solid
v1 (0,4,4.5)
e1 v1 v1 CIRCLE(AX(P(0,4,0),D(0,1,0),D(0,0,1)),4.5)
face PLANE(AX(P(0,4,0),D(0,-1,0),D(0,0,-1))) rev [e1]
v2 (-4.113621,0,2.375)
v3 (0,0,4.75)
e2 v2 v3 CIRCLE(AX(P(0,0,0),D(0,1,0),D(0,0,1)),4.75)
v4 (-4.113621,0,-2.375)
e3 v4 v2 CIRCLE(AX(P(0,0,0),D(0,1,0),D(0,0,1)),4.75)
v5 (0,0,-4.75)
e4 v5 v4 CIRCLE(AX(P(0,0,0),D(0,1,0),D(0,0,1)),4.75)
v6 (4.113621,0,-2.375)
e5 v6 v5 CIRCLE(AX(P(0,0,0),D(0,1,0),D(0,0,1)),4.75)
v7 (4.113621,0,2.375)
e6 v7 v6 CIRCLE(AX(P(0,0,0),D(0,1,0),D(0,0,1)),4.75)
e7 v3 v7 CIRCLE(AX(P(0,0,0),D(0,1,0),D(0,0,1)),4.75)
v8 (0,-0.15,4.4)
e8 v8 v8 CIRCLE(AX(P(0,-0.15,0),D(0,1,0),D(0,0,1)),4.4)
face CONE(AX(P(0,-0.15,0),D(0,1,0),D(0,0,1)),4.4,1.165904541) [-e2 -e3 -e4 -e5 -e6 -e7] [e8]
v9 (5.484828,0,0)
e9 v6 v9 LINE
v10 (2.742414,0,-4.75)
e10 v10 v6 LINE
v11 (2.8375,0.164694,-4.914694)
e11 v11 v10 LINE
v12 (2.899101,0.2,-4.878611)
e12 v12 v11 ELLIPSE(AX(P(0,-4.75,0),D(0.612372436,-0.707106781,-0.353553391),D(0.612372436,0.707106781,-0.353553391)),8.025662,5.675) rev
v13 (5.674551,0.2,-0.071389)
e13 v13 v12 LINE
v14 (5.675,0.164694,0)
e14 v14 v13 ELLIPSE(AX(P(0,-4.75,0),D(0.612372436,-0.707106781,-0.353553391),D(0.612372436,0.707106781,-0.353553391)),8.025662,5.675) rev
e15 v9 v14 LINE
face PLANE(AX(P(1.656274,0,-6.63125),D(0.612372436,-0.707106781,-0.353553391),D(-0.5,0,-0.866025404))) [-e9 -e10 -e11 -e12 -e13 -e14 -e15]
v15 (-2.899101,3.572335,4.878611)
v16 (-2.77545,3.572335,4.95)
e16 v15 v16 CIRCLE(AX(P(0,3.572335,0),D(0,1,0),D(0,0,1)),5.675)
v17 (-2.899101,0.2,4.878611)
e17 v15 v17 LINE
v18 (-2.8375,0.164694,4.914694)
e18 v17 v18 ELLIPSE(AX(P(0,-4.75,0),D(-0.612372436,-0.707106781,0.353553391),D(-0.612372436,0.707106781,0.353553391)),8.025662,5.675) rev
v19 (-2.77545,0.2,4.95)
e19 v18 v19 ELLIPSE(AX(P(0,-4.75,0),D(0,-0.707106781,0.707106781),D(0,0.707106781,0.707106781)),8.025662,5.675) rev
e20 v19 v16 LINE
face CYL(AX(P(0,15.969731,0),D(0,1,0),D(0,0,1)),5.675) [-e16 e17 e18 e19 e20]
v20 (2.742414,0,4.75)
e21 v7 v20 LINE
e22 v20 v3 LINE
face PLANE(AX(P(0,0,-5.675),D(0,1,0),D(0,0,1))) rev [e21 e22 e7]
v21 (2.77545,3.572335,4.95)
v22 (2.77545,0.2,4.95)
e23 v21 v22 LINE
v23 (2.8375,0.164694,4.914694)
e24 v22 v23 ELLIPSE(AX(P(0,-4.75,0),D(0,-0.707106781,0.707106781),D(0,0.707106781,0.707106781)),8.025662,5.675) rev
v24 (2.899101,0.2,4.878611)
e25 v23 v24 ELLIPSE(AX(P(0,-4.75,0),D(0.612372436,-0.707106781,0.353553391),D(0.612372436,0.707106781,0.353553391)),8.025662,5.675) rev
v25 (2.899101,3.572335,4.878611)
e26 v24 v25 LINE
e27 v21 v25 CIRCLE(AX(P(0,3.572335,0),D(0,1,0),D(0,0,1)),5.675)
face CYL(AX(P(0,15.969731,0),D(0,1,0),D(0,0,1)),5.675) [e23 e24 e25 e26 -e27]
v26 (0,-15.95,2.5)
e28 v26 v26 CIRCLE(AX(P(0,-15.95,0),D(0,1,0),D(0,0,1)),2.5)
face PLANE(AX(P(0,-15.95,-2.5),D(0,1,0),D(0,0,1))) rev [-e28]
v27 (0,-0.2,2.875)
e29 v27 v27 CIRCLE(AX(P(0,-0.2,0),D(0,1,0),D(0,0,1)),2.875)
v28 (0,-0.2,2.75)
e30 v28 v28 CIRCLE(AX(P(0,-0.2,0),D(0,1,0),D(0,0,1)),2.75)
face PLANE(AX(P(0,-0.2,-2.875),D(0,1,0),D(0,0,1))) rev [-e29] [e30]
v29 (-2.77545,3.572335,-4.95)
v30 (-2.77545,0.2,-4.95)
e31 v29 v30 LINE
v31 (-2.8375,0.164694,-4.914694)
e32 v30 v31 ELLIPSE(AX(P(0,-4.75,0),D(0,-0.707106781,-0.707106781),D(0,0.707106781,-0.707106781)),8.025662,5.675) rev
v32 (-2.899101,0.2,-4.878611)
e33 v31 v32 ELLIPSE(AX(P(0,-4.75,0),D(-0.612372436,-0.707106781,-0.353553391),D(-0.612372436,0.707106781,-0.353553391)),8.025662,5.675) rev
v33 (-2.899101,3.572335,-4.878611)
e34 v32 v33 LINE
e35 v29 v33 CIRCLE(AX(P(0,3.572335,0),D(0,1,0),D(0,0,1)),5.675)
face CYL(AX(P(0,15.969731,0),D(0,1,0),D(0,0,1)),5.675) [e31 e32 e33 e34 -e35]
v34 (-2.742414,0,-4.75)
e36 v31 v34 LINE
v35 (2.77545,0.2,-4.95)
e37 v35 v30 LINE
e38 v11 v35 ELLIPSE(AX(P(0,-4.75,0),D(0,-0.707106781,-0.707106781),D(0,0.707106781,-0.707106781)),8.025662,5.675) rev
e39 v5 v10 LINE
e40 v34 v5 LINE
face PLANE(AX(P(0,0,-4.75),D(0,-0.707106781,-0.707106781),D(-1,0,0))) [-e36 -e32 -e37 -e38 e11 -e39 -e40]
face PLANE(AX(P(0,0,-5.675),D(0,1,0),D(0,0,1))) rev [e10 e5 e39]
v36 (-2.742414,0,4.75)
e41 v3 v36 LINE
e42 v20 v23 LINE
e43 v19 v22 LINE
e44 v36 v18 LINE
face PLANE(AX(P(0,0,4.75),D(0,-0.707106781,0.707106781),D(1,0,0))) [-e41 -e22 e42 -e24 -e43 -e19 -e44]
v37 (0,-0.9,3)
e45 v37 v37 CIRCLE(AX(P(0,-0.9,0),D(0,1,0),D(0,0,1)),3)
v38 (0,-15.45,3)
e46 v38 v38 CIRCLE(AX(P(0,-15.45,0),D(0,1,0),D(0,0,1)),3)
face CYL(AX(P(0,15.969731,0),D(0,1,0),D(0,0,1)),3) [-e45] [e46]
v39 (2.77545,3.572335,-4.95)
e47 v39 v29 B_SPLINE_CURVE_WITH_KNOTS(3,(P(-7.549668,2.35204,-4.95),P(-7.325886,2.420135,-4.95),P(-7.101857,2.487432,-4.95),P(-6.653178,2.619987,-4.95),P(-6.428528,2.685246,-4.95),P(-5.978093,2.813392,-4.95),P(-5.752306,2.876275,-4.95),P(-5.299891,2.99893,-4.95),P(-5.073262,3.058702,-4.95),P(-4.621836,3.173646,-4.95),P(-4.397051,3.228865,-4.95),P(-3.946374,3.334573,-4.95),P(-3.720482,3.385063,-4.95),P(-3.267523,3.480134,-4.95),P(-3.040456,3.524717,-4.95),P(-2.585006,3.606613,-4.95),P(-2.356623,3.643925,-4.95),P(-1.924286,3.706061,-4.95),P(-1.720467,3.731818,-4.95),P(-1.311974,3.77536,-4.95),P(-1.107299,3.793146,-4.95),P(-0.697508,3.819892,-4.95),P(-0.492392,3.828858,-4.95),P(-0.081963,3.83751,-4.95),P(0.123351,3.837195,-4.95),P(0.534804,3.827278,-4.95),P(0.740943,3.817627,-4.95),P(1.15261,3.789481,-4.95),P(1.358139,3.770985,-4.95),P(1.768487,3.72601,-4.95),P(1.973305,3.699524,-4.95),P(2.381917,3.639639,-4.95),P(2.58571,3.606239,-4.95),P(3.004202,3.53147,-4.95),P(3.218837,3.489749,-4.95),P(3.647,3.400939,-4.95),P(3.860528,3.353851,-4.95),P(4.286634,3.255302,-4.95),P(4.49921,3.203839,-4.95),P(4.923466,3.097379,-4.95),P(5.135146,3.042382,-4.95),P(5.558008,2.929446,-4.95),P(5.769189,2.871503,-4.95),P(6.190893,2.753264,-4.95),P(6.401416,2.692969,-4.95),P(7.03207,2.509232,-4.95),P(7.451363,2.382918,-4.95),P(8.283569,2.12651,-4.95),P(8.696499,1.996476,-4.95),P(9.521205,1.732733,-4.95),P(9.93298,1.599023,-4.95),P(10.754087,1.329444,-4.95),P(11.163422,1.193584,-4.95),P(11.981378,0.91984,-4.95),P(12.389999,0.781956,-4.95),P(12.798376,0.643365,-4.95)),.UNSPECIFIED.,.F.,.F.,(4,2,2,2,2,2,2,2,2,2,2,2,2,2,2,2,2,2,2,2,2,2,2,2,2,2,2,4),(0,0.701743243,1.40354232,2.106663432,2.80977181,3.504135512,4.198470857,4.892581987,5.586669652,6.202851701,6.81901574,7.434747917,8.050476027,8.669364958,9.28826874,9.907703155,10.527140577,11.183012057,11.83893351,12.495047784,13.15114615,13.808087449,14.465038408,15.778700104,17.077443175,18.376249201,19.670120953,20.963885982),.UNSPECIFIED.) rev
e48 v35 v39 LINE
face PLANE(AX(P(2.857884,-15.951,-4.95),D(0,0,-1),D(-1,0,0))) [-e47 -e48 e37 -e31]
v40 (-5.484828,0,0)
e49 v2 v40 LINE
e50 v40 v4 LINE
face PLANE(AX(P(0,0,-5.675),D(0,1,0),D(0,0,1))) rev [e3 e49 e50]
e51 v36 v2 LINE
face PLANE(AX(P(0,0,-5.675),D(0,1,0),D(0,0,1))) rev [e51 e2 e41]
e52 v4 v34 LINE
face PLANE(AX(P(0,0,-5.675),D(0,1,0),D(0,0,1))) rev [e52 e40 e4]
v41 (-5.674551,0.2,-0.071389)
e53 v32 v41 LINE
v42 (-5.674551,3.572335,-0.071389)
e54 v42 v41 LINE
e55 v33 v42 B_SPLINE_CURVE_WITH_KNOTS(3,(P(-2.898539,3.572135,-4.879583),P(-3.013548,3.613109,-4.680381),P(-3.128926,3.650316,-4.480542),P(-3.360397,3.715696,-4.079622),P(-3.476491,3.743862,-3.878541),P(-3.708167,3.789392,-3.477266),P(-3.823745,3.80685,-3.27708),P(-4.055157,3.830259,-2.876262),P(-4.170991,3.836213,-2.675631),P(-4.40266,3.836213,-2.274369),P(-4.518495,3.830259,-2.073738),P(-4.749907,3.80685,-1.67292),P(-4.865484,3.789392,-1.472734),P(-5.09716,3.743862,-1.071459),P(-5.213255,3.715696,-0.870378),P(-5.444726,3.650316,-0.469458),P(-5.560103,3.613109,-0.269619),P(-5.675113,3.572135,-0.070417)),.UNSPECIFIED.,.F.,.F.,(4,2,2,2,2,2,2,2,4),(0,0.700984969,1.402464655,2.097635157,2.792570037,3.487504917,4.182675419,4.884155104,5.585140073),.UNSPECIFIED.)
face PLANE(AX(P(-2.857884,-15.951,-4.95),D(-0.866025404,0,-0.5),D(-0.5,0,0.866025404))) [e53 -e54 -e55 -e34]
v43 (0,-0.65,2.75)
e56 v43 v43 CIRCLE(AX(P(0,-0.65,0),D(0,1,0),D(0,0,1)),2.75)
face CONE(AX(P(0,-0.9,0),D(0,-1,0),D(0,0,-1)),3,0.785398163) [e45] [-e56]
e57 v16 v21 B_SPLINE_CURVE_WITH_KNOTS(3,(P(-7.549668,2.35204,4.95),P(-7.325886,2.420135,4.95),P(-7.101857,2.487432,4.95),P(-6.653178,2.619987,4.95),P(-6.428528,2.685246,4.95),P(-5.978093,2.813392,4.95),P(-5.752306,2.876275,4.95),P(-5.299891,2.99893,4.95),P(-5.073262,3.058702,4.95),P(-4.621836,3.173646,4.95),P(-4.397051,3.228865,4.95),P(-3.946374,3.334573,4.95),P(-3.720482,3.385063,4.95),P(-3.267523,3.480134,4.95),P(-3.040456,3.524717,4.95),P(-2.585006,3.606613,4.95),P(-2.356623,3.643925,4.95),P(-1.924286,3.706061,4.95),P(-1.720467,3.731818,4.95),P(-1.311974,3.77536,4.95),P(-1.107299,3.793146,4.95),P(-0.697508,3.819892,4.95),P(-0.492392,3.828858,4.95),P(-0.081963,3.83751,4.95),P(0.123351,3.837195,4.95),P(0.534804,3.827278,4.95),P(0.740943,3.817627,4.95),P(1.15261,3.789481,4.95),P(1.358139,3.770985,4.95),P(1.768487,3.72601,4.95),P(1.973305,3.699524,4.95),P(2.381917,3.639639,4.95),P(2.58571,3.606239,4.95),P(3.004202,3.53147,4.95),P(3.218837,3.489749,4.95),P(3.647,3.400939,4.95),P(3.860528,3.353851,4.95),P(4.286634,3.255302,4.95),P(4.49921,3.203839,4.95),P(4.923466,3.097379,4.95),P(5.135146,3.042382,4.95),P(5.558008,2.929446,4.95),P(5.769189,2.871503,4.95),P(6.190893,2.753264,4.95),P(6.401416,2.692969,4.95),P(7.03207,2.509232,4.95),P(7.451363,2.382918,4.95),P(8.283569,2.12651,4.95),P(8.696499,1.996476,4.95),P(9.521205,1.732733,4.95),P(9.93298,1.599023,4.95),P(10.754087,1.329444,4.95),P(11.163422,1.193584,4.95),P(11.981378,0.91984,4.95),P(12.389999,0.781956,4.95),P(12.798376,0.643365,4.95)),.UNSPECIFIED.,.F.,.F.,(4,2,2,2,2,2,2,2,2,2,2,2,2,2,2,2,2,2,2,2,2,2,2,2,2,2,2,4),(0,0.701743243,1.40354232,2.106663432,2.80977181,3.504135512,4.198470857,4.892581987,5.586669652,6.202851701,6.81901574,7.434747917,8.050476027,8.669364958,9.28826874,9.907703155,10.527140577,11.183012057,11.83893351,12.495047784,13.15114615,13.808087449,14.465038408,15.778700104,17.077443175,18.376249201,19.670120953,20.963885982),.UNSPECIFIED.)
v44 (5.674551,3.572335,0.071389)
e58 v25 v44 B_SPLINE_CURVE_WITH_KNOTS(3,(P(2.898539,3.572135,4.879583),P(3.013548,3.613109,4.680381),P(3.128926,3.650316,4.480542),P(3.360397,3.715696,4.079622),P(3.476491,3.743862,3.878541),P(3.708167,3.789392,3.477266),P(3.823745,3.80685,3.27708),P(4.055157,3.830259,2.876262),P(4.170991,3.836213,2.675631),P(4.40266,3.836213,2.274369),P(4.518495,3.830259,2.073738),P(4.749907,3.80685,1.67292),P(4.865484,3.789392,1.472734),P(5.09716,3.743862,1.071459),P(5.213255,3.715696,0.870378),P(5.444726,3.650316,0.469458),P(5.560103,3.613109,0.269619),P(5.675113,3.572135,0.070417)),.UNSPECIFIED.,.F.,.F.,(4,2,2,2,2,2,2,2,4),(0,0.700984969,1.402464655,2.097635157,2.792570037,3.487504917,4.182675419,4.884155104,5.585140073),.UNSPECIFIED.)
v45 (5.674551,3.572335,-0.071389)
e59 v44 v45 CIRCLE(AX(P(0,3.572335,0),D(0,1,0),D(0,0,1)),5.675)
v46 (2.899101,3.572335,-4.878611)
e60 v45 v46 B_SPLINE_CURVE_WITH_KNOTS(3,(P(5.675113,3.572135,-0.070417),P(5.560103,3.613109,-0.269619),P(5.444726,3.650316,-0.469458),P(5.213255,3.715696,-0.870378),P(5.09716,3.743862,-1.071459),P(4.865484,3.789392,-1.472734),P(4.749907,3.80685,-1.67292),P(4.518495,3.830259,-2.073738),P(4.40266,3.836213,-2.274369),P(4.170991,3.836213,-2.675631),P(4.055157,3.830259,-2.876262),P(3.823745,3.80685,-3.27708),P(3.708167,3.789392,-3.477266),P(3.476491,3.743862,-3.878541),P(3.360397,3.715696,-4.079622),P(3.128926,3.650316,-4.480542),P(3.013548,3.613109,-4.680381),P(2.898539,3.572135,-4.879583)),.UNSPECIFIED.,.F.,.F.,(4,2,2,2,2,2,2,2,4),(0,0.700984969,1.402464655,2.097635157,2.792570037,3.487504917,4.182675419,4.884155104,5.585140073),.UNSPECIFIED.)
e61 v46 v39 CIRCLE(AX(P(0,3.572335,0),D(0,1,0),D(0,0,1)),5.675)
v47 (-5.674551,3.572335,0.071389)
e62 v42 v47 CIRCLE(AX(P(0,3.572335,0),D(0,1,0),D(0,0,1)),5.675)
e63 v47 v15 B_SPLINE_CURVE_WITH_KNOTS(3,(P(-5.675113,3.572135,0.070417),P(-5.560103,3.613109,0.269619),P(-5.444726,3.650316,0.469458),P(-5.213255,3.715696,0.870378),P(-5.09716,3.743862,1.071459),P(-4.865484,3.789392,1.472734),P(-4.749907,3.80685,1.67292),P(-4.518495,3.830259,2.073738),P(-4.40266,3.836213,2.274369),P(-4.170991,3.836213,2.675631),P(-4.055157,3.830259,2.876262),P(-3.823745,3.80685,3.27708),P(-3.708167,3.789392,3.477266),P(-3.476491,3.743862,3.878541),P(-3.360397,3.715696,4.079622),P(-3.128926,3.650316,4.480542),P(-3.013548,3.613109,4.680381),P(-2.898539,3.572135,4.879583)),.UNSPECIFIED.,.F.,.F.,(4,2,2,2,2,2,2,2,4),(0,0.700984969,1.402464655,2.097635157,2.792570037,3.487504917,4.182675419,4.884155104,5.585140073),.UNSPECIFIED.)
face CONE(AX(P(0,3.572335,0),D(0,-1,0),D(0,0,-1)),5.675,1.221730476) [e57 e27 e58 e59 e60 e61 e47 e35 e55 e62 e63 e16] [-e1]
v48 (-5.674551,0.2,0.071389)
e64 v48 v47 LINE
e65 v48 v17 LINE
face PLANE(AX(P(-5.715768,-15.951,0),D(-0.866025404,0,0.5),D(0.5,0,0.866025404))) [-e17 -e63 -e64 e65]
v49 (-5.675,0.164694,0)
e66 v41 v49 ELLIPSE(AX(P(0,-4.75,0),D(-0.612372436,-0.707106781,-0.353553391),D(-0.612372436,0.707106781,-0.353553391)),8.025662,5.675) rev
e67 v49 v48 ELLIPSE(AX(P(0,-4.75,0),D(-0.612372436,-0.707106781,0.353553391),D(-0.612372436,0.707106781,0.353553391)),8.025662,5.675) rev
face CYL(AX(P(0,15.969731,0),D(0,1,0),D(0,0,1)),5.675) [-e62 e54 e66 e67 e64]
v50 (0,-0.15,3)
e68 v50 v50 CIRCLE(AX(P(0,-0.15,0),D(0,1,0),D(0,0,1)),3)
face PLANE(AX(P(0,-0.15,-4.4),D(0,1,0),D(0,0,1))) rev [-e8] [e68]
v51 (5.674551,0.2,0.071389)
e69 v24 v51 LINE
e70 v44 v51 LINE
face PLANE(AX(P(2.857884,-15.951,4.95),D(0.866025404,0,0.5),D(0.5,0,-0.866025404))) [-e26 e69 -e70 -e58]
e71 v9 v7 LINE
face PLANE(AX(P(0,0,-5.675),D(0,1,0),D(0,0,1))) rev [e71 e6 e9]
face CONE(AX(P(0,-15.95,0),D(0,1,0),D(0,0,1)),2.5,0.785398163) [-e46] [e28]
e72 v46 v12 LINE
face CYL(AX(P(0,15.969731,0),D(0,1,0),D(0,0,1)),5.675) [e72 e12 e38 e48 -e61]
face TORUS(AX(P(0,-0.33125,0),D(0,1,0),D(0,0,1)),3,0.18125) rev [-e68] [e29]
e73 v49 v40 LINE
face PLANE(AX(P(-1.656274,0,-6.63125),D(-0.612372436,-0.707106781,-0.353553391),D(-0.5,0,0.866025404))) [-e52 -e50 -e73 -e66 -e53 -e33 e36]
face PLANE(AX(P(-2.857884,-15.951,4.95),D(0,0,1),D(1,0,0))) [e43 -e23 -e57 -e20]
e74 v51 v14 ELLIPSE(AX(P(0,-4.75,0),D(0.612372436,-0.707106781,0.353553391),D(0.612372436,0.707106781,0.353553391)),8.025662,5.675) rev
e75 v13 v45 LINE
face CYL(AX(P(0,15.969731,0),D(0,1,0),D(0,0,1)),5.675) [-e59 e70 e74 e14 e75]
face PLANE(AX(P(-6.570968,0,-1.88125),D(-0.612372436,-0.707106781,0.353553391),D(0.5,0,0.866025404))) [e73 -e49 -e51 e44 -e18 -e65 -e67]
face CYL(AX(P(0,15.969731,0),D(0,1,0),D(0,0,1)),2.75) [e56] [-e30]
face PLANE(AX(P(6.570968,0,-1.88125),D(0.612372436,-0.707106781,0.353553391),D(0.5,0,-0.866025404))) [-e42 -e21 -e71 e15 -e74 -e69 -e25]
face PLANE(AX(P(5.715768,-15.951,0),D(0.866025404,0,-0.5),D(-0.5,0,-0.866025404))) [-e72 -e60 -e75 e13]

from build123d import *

# Parameters (mm, degrees)
SKETCH2_OUTSIDE_W  = 18.472
SKETCH2_OUTSIDE_H  = 18.472
CUT_EXTRUDE1_DEPTH = 19.95
CHAMFER1_SIZE      = 0.2


with BuildPart() as part:
    # Sketch1 → Revolve1 (revolve)
    with BuildSketch(Plane(origin=(0, 0, 0), x_dir=(0, 0, -1), z_dir=(1, 0, 0)), mode=Mode.PRIVATE) as revolve1_sk:
        with BuildLine():
            Line((0, 4), (4.5, 4))
            Line((4.5, 4), (5.675, 3.572334975))
            Line((5.675, 3.572334975), (5.675, 0))
            Line((5.675, 0), (4.75, 0))
            Line((4.75, 0), (4.4, -0.15))
            Line((4.4, -0.15), (3, -0.15))
            ThreePointArc((3, -0.15), (2.93268544, -0.1629636), (2.875, -0.2))
            Line((2.875, -0.2), (2.75, -0.2))
            Line((2.75, -0.2), (2.75, -0.65))
            Line((2.75, -0.65), (3, -0.9))
            Line((3, -0.9), (3, -15.45))
            Line((3, -15.45), (2.5, -15.95))
            Line((2.5, -15.95), (0, -15.95))
            Line((0, -15.95), (0, 4))
        make_face()
    revolve(revolve1_sk.sketch.rotate(Axis((0, 15.969730791, 0), (0, -1, 0)), 180), axis=Axis((0, 15.969730791, 0), (0, -1, 0)))

    # Sketch2 outside → Cut-Extrude1 (cut)
    with BuildSketch(Plane(origin=(0, 4, 0), x_dir=(1, 0, 0), z_dir=(0, 1, 0))):
        Rectangle(SKETCH2_OUTSIDE_W, SKETCH2_OUTSIDE_H)
        Polygon((2.857883832, -4.95), (5.715767665, 0), (2.857883832, 4.95), (-2.857883832, 4.95), (-5.715767665, 0), (-2.857883832, -4.95), align=None, mode=Mode.SUBTRACT)
    extrude(amount=-CUT_EXTRUDE1_DEPTH, mode=Mode.SUBTRACT)

    # Chamfer1
    # the kernel refuses this chamfer: 0.2 mm, written as the material it takes off along each edge
    with BuildSketch(Plane(origin=(-2.641932243, 0, 5.324039125), x_dir=(-0.023812127644090332, 0.9996219169112968, 0.01374793830529327), z_dir=(-0.4999999999999996, 0, -0.8660254037844389)), Plane(origin=(3.289787011, 0, 4.95), x_dir=(0, 0.9996219169112966, 0.027495876610587326), z_dir=(-1, 0, 0)), Plane(origin=(5.931719254, 0, -0.374039125), x_dir=(0.023812127644088587, 0.9996219169112968, 0.013747938305292286), z_dir=(-0.5000000000000003, 0, 0.8660254037844386)), Plane(origin=(-5.931719254, 0, 0.374039125), x_dir=(-0.023812127644091206, 0.9996219169112966, -0.013747938305293793), z_dir=(0.5000000000000002, 0, -0.8660254037844386)), Plane(origin=(-3.289787011, 0, -4.95), x_dir=(0, 0.9996219169112966, -0.027495876610587326), z_dir=(1, 0, 0)), Plane(origin=(2.641932243, 0, -5.324039125), x_dir=(0.02381212764409033, 0.9996219169112968, -0.013747938305293275), z_dir=(0.49999999999999994, 0, 0.8660254037844388))) as chamfer1_piece_1:
        Polygon((CHAMFER1_SIZE * 0.999621916911, CHAMFER1_SIZE * 0.0274958766106), (-CHAMFER1_SIZE * 0.0274958766106, CHAMFER1_SIZE * 0.999621916911), (0, 0), align=None)
    extrude(amount=6.579574023, mode=Mode.SUBTRACT)


solid = part.part
